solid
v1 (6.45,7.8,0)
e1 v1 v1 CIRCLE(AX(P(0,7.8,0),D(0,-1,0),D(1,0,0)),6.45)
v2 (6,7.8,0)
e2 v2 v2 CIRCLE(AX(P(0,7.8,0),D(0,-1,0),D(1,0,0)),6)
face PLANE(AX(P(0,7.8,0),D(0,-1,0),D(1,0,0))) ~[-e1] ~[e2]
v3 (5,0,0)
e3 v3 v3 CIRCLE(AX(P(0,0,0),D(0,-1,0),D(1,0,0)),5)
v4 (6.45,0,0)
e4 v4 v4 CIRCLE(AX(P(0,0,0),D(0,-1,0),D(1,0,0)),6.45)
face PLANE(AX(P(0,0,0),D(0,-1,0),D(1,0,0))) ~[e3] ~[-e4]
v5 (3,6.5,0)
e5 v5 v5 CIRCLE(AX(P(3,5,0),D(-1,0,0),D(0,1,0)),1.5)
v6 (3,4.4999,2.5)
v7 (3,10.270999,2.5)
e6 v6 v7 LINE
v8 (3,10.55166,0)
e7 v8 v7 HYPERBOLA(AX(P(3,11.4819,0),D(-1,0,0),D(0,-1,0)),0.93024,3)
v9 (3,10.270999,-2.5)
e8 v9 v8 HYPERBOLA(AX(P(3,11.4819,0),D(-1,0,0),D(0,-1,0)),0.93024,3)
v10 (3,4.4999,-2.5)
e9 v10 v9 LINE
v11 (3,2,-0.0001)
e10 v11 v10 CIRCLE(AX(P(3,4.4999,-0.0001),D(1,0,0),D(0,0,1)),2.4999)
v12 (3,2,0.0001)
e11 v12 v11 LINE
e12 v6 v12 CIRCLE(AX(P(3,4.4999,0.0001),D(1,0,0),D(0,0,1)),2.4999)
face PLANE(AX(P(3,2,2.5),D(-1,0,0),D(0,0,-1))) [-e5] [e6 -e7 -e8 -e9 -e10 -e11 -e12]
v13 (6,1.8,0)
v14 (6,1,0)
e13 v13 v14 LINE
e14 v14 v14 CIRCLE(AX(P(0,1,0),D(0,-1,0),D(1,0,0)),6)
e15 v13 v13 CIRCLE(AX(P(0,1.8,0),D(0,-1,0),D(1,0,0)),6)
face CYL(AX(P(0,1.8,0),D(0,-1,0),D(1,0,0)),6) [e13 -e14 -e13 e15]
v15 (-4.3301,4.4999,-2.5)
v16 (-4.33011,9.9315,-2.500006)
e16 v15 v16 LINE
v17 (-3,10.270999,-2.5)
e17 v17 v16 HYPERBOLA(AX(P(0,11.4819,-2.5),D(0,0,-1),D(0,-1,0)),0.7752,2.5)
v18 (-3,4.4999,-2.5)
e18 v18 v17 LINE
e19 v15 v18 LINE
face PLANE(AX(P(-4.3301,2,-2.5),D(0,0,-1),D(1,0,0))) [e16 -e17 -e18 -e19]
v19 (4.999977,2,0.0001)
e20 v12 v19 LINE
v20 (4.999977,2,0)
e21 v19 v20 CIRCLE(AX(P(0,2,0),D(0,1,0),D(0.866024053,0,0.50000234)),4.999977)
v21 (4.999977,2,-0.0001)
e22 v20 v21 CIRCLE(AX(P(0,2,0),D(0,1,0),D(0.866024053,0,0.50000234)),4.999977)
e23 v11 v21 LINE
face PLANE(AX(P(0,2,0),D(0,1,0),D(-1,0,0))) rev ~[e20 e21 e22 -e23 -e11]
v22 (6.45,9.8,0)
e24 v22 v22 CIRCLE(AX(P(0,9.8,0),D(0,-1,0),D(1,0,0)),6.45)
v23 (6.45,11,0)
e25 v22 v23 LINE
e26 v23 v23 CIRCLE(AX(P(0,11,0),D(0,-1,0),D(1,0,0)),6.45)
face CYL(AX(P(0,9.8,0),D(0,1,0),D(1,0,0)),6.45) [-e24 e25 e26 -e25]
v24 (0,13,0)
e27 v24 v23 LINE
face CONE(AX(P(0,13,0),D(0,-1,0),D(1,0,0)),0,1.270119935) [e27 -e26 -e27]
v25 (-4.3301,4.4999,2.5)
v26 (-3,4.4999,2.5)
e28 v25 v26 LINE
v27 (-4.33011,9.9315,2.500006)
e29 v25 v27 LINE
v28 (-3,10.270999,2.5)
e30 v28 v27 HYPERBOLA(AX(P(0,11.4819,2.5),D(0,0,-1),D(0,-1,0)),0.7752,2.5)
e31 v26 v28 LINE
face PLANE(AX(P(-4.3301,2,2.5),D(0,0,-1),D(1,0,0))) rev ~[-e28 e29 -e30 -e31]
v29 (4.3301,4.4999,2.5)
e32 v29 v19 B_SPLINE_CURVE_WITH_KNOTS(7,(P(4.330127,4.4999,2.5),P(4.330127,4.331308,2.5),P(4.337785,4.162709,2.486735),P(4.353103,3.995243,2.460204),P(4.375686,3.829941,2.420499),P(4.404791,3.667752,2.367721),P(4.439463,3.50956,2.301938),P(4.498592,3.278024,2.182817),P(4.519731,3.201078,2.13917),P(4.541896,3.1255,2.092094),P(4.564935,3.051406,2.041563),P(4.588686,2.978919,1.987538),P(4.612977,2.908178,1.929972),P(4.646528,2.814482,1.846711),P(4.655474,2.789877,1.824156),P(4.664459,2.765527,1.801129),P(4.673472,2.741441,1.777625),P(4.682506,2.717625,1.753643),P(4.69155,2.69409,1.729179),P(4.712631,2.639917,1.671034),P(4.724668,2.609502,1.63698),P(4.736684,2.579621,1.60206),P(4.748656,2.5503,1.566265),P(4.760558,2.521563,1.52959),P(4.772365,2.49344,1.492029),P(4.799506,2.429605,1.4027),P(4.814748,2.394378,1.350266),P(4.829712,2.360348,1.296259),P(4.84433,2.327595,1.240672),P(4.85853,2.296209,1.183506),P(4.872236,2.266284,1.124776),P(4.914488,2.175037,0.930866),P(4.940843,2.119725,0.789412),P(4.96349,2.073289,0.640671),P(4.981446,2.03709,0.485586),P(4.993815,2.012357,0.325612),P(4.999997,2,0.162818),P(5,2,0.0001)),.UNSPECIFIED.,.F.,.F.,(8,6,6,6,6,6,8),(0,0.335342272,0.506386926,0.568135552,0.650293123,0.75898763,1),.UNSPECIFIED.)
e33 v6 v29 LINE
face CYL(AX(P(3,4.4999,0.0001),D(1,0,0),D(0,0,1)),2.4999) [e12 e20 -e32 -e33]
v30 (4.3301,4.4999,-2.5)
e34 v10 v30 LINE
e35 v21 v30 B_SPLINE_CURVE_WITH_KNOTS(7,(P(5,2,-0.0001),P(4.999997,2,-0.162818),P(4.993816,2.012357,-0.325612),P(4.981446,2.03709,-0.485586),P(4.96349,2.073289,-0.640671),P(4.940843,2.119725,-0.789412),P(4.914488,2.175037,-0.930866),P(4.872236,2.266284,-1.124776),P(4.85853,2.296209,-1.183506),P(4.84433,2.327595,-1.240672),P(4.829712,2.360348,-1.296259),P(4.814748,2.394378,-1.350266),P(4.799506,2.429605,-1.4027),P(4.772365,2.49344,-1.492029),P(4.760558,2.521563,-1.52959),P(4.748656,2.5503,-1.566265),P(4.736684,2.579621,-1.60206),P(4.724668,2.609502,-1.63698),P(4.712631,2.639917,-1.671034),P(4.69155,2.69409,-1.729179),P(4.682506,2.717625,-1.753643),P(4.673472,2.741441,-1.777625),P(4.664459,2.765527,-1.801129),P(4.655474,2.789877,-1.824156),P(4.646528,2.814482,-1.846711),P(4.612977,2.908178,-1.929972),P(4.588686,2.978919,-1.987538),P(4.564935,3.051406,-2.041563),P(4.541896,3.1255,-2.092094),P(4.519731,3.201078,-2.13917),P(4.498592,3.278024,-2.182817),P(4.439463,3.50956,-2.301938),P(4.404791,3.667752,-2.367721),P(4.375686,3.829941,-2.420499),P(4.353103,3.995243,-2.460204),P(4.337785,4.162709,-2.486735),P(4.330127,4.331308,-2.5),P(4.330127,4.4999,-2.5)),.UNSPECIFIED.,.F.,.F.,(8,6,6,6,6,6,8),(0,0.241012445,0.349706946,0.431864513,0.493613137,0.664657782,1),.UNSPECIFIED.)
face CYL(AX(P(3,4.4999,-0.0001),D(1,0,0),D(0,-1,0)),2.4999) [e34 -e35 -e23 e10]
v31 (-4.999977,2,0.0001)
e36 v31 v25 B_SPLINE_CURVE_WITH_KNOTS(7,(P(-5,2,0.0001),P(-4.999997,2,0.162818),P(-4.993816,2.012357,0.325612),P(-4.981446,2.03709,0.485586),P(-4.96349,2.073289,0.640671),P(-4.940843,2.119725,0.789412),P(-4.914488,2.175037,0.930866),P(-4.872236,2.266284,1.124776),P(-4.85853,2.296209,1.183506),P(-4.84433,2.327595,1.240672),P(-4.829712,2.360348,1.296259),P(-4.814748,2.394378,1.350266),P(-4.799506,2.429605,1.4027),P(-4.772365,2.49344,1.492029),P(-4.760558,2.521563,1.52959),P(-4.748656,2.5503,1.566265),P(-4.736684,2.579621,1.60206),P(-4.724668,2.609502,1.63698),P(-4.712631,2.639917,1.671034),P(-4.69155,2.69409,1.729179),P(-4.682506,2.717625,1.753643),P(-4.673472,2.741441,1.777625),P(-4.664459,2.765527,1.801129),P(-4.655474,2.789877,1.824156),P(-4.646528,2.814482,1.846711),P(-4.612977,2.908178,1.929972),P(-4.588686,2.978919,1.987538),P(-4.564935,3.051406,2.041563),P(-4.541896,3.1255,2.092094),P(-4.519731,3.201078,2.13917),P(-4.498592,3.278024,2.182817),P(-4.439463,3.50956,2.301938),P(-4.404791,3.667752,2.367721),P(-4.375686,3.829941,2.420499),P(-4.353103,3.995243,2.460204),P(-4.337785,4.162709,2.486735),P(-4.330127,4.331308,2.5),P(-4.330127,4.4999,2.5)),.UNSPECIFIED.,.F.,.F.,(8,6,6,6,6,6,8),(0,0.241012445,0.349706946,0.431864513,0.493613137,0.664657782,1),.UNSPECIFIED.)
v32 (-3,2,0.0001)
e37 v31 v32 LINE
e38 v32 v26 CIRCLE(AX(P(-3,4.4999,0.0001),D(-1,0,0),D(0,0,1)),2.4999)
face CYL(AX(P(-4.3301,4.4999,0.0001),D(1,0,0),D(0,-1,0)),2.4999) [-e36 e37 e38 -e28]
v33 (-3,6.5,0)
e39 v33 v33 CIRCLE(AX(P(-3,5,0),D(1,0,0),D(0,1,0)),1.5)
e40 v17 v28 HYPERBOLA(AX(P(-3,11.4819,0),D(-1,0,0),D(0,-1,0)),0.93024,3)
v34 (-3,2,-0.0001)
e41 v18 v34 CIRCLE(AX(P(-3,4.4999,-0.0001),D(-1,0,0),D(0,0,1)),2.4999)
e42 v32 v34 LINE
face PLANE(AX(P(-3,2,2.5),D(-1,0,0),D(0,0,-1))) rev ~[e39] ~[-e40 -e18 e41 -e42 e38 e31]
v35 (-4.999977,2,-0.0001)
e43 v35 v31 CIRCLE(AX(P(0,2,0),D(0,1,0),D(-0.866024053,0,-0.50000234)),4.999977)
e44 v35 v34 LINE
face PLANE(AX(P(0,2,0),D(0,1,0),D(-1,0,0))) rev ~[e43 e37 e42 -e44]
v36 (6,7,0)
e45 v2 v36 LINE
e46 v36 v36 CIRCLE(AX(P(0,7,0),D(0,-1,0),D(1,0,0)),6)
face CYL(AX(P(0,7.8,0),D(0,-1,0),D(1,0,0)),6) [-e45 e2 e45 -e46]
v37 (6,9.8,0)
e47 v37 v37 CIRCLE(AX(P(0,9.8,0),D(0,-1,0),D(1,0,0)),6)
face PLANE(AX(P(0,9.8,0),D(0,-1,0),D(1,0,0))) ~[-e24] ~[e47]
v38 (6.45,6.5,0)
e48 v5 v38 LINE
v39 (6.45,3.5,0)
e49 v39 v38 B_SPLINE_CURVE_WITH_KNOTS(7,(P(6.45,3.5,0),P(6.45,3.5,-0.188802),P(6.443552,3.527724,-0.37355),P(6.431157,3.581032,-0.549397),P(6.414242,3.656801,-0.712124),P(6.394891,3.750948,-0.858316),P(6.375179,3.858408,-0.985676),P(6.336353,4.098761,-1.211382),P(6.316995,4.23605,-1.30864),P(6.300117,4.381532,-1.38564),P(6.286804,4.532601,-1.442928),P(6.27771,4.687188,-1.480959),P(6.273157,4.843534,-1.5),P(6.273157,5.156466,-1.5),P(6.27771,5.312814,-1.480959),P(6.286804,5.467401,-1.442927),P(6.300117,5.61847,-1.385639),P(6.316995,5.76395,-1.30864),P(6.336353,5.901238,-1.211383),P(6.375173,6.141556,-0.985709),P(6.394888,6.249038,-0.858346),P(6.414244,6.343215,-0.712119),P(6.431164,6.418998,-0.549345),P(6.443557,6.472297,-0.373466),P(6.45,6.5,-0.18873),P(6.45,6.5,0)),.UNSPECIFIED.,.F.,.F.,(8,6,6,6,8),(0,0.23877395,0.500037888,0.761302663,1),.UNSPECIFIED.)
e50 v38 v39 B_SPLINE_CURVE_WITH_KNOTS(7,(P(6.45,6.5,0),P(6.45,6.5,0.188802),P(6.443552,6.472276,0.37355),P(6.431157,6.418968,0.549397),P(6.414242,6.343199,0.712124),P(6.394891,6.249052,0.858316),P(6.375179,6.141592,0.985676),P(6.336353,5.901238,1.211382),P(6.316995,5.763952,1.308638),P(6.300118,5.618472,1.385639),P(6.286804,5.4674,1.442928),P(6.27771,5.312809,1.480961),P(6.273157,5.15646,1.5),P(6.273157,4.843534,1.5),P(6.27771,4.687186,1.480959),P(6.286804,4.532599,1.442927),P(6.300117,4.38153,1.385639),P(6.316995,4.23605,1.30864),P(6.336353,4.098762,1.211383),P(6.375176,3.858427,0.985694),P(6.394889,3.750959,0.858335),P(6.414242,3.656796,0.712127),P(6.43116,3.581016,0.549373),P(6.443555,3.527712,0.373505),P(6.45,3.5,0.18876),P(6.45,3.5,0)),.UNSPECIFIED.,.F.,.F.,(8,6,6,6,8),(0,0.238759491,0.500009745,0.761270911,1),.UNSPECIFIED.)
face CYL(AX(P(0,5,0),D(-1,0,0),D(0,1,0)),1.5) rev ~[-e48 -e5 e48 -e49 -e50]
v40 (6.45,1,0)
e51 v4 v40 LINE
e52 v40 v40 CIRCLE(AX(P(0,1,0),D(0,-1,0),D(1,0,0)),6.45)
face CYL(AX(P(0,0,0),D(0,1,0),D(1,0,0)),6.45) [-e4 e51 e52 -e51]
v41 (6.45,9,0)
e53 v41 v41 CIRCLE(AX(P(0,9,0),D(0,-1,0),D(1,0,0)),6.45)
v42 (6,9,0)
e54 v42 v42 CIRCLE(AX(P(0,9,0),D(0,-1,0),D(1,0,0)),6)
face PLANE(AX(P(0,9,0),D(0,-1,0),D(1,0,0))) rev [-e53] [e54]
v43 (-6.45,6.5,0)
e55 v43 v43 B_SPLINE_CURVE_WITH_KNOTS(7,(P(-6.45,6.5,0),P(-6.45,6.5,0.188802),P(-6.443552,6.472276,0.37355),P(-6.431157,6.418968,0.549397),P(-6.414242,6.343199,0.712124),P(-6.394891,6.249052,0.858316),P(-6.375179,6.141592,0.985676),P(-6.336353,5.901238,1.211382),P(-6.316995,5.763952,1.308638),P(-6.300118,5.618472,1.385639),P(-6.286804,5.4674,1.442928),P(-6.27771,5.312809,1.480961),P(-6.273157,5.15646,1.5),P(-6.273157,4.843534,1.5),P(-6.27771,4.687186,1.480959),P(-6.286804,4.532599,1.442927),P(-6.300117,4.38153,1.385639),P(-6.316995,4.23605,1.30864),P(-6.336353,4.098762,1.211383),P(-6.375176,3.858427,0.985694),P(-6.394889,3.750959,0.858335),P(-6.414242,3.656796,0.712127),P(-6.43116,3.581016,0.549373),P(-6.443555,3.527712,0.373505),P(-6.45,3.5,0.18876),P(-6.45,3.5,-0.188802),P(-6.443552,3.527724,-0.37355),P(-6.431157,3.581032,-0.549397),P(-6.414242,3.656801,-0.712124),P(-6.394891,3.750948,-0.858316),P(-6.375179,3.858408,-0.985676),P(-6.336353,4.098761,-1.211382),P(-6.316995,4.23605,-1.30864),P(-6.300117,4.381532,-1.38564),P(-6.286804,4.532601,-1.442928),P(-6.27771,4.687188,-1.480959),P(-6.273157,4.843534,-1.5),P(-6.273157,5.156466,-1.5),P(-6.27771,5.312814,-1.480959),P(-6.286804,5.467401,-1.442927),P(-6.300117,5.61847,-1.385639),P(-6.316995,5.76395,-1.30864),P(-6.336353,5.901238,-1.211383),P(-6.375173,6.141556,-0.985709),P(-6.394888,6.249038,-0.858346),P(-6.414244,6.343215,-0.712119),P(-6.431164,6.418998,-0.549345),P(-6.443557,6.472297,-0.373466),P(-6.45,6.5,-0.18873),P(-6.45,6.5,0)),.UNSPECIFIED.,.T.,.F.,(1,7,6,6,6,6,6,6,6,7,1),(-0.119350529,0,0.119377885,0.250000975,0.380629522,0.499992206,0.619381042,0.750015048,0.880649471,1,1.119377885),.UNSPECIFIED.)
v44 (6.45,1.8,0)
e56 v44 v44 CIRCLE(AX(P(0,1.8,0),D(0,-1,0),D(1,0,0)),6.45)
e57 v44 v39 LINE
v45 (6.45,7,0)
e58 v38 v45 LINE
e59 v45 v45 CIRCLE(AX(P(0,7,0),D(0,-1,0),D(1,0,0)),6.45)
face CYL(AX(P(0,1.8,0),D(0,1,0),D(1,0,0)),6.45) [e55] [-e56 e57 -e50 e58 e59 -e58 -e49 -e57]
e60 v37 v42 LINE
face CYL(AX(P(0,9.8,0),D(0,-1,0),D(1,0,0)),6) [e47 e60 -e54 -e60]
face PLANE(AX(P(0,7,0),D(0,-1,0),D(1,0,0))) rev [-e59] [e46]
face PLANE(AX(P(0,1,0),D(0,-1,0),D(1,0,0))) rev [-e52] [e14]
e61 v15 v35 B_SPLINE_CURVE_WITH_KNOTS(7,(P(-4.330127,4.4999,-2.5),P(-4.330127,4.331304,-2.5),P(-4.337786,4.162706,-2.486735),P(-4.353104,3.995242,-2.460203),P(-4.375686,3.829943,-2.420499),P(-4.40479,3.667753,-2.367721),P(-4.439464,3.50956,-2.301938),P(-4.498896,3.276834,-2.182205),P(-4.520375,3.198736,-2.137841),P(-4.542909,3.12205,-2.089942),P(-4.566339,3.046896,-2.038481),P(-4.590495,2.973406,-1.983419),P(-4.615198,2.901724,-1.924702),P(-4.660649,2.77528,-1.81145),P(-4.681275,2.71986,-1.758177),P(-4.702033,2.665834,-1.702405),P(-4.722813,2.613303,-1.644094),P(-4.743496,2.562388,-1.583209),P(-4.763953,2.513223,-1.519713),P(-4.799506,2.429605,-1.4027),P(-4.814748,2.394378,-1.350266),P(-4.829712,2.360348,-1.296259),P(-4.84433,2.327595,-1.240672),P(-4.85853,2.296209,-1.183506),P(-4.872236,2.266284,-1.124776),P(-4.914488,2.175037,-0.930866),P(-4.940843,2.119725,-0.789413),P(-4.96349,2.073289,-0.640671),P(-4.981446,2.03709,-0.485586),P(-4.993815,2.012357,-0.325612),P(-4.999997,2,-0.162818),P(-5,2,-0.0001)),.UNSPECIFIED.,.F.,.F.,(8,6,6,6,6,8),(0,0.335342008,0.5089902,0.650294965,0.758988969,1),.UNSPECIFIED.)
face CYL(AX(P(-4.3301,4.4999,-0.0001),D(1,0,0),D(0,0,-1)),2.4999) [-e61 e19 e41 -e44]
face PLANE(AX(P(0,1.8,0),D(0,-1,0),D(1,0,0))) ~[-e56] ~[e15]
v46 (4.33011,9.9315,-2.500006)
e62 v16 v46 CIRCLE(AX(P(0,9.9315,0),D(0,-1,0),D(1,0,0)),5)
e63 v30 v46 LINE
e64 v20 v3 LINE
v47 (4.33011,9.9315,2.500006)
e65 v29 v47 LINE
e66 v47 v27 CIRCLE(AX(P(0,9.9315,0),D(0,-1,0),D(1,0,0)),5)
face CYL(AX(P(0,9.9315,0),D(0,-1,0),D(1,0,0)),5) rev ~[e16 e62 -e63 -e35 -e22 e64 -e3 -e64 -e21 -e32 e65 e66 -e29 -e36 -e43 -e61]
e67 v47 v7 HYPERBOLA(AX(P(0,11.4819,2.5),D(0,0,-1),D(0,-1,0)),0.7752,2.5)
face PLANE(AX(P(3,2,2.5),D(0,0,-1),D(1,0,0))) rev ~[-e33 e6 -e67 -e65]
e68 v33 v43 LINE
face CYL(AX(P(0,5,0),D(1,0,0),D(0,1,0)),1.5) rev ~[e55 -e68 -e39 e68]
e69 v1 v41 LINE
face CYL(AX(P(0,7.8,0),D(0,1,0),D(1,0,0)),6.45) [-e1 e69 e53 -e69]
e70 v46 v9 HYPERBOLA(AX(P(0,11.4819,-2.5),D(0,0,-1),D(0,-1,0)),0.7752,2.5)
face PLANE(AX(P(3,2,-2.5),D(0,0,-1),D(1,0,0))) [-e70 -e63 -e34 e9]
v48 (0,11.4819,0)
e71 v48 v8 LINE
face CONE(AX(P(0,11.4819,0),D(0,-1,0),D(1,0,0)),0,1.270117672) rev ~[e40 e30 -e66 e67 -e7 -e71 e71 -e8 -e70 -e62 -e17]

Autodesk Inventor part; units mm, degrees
ref_plane "YZ Plane" through (0, 0, 0) normal (1, 0, 0) x (0, 1, 0)
ref_plane "XY Plane" through (0, 0, 0) normal (0, 0, 1) x (1, 0, 0)
sketch "Sketch1" plane through (0, 0, 0) normal (0, 0, 1) x (1, 0, 0)
  line L0 (5, 0) -> (6.45, 0)
  line L1 (0, 13) -> (0, 11.4819)
  line L2 (6, 1) -> (6.45, 1)
  line L3 (6, 1.8) -> (6.45, 1.8)
  line L4 (6, 1.8) -> (6, 1)
  line L5 (6.45, 0) -> (6.45, 1)
  line L6 (6, 7) -> (6.45, 7)
  line L7 (6, 7.8) -> (6.45, 7.8)
  line L8 (6, 7.8) -> (6, 7)
  line L9 (6.45, 1.8) -> (6.45, 7)
  line L10 (6, 9) -> (6.45, 9)
  line L11 (6, 9.8) -> (6.45, 9.8)
  line L12 (6, 9.8) -> (6, 9)
  line L13 (6.45, 7.8) -> (6.45, 9)
  line L14 (6.45, 9.8) -> (6.45, 11)
  line L15 (0, 13) -> (6.45, 11)
  line L16 (5, 9.9315) -> (5, 0)
  line L17 (0, 11.4819) -> (5, 9.9315)
  point P0 (0, 0)
revolve "Revolution1" add sketch "Sketch1" angle 360 about axis through (0, 13, 0) along (0, -1, 0)
ref_plane "Work Plane1" through (0, 2, 0) normal (0, 1, 0) x (-1, 0, 0)
sketch "Sketch2" plane through (0, 2, 0) normal (0, 1, 0) x (-1, 0, 0)
  line L0 (-3, 2.5) -> (-3, -2.5)
  line L1 (3, 2.5) -> (3, -2.5)
  line L2 (4.3301, 2.5) -> (3, 2.5)
  line L3 (-3, 2.5) -> (-4.3301, 2.5)
  line L4 (4.3301, -2.5) -> (3, -2.5)
  line L5 (-3, -2.5) -> (-4.3301, -2.5)
  arc A0 (-4.3301, 2.5) -> (-4.3301, -2.5) centre (0, 0) ccw
  arc A1 (4.3301, -2.5) -> (4.3301, 2.5) centre (0, 0) ccw
extrude "Extrusion1" add sketch "Sketch2" along normal blind 9
fillet "Fillet1" radius 2.5 4 edges at (-3.6651, 2, 2.5) (-3.6651, 2, -2.5) (3.6651, 2, 2.5) (3.6651, 2, -2.5)
sketch "Sketch3" plane through (0, 0, 0) normal (1, 0, 0) x (0, 1, 0)
  circle A0 centre (5, 0) radius 1.5
extrude "Extrusion2" cut sketch "Sketch3" along normal mid plane 20
properties part number "piston"
